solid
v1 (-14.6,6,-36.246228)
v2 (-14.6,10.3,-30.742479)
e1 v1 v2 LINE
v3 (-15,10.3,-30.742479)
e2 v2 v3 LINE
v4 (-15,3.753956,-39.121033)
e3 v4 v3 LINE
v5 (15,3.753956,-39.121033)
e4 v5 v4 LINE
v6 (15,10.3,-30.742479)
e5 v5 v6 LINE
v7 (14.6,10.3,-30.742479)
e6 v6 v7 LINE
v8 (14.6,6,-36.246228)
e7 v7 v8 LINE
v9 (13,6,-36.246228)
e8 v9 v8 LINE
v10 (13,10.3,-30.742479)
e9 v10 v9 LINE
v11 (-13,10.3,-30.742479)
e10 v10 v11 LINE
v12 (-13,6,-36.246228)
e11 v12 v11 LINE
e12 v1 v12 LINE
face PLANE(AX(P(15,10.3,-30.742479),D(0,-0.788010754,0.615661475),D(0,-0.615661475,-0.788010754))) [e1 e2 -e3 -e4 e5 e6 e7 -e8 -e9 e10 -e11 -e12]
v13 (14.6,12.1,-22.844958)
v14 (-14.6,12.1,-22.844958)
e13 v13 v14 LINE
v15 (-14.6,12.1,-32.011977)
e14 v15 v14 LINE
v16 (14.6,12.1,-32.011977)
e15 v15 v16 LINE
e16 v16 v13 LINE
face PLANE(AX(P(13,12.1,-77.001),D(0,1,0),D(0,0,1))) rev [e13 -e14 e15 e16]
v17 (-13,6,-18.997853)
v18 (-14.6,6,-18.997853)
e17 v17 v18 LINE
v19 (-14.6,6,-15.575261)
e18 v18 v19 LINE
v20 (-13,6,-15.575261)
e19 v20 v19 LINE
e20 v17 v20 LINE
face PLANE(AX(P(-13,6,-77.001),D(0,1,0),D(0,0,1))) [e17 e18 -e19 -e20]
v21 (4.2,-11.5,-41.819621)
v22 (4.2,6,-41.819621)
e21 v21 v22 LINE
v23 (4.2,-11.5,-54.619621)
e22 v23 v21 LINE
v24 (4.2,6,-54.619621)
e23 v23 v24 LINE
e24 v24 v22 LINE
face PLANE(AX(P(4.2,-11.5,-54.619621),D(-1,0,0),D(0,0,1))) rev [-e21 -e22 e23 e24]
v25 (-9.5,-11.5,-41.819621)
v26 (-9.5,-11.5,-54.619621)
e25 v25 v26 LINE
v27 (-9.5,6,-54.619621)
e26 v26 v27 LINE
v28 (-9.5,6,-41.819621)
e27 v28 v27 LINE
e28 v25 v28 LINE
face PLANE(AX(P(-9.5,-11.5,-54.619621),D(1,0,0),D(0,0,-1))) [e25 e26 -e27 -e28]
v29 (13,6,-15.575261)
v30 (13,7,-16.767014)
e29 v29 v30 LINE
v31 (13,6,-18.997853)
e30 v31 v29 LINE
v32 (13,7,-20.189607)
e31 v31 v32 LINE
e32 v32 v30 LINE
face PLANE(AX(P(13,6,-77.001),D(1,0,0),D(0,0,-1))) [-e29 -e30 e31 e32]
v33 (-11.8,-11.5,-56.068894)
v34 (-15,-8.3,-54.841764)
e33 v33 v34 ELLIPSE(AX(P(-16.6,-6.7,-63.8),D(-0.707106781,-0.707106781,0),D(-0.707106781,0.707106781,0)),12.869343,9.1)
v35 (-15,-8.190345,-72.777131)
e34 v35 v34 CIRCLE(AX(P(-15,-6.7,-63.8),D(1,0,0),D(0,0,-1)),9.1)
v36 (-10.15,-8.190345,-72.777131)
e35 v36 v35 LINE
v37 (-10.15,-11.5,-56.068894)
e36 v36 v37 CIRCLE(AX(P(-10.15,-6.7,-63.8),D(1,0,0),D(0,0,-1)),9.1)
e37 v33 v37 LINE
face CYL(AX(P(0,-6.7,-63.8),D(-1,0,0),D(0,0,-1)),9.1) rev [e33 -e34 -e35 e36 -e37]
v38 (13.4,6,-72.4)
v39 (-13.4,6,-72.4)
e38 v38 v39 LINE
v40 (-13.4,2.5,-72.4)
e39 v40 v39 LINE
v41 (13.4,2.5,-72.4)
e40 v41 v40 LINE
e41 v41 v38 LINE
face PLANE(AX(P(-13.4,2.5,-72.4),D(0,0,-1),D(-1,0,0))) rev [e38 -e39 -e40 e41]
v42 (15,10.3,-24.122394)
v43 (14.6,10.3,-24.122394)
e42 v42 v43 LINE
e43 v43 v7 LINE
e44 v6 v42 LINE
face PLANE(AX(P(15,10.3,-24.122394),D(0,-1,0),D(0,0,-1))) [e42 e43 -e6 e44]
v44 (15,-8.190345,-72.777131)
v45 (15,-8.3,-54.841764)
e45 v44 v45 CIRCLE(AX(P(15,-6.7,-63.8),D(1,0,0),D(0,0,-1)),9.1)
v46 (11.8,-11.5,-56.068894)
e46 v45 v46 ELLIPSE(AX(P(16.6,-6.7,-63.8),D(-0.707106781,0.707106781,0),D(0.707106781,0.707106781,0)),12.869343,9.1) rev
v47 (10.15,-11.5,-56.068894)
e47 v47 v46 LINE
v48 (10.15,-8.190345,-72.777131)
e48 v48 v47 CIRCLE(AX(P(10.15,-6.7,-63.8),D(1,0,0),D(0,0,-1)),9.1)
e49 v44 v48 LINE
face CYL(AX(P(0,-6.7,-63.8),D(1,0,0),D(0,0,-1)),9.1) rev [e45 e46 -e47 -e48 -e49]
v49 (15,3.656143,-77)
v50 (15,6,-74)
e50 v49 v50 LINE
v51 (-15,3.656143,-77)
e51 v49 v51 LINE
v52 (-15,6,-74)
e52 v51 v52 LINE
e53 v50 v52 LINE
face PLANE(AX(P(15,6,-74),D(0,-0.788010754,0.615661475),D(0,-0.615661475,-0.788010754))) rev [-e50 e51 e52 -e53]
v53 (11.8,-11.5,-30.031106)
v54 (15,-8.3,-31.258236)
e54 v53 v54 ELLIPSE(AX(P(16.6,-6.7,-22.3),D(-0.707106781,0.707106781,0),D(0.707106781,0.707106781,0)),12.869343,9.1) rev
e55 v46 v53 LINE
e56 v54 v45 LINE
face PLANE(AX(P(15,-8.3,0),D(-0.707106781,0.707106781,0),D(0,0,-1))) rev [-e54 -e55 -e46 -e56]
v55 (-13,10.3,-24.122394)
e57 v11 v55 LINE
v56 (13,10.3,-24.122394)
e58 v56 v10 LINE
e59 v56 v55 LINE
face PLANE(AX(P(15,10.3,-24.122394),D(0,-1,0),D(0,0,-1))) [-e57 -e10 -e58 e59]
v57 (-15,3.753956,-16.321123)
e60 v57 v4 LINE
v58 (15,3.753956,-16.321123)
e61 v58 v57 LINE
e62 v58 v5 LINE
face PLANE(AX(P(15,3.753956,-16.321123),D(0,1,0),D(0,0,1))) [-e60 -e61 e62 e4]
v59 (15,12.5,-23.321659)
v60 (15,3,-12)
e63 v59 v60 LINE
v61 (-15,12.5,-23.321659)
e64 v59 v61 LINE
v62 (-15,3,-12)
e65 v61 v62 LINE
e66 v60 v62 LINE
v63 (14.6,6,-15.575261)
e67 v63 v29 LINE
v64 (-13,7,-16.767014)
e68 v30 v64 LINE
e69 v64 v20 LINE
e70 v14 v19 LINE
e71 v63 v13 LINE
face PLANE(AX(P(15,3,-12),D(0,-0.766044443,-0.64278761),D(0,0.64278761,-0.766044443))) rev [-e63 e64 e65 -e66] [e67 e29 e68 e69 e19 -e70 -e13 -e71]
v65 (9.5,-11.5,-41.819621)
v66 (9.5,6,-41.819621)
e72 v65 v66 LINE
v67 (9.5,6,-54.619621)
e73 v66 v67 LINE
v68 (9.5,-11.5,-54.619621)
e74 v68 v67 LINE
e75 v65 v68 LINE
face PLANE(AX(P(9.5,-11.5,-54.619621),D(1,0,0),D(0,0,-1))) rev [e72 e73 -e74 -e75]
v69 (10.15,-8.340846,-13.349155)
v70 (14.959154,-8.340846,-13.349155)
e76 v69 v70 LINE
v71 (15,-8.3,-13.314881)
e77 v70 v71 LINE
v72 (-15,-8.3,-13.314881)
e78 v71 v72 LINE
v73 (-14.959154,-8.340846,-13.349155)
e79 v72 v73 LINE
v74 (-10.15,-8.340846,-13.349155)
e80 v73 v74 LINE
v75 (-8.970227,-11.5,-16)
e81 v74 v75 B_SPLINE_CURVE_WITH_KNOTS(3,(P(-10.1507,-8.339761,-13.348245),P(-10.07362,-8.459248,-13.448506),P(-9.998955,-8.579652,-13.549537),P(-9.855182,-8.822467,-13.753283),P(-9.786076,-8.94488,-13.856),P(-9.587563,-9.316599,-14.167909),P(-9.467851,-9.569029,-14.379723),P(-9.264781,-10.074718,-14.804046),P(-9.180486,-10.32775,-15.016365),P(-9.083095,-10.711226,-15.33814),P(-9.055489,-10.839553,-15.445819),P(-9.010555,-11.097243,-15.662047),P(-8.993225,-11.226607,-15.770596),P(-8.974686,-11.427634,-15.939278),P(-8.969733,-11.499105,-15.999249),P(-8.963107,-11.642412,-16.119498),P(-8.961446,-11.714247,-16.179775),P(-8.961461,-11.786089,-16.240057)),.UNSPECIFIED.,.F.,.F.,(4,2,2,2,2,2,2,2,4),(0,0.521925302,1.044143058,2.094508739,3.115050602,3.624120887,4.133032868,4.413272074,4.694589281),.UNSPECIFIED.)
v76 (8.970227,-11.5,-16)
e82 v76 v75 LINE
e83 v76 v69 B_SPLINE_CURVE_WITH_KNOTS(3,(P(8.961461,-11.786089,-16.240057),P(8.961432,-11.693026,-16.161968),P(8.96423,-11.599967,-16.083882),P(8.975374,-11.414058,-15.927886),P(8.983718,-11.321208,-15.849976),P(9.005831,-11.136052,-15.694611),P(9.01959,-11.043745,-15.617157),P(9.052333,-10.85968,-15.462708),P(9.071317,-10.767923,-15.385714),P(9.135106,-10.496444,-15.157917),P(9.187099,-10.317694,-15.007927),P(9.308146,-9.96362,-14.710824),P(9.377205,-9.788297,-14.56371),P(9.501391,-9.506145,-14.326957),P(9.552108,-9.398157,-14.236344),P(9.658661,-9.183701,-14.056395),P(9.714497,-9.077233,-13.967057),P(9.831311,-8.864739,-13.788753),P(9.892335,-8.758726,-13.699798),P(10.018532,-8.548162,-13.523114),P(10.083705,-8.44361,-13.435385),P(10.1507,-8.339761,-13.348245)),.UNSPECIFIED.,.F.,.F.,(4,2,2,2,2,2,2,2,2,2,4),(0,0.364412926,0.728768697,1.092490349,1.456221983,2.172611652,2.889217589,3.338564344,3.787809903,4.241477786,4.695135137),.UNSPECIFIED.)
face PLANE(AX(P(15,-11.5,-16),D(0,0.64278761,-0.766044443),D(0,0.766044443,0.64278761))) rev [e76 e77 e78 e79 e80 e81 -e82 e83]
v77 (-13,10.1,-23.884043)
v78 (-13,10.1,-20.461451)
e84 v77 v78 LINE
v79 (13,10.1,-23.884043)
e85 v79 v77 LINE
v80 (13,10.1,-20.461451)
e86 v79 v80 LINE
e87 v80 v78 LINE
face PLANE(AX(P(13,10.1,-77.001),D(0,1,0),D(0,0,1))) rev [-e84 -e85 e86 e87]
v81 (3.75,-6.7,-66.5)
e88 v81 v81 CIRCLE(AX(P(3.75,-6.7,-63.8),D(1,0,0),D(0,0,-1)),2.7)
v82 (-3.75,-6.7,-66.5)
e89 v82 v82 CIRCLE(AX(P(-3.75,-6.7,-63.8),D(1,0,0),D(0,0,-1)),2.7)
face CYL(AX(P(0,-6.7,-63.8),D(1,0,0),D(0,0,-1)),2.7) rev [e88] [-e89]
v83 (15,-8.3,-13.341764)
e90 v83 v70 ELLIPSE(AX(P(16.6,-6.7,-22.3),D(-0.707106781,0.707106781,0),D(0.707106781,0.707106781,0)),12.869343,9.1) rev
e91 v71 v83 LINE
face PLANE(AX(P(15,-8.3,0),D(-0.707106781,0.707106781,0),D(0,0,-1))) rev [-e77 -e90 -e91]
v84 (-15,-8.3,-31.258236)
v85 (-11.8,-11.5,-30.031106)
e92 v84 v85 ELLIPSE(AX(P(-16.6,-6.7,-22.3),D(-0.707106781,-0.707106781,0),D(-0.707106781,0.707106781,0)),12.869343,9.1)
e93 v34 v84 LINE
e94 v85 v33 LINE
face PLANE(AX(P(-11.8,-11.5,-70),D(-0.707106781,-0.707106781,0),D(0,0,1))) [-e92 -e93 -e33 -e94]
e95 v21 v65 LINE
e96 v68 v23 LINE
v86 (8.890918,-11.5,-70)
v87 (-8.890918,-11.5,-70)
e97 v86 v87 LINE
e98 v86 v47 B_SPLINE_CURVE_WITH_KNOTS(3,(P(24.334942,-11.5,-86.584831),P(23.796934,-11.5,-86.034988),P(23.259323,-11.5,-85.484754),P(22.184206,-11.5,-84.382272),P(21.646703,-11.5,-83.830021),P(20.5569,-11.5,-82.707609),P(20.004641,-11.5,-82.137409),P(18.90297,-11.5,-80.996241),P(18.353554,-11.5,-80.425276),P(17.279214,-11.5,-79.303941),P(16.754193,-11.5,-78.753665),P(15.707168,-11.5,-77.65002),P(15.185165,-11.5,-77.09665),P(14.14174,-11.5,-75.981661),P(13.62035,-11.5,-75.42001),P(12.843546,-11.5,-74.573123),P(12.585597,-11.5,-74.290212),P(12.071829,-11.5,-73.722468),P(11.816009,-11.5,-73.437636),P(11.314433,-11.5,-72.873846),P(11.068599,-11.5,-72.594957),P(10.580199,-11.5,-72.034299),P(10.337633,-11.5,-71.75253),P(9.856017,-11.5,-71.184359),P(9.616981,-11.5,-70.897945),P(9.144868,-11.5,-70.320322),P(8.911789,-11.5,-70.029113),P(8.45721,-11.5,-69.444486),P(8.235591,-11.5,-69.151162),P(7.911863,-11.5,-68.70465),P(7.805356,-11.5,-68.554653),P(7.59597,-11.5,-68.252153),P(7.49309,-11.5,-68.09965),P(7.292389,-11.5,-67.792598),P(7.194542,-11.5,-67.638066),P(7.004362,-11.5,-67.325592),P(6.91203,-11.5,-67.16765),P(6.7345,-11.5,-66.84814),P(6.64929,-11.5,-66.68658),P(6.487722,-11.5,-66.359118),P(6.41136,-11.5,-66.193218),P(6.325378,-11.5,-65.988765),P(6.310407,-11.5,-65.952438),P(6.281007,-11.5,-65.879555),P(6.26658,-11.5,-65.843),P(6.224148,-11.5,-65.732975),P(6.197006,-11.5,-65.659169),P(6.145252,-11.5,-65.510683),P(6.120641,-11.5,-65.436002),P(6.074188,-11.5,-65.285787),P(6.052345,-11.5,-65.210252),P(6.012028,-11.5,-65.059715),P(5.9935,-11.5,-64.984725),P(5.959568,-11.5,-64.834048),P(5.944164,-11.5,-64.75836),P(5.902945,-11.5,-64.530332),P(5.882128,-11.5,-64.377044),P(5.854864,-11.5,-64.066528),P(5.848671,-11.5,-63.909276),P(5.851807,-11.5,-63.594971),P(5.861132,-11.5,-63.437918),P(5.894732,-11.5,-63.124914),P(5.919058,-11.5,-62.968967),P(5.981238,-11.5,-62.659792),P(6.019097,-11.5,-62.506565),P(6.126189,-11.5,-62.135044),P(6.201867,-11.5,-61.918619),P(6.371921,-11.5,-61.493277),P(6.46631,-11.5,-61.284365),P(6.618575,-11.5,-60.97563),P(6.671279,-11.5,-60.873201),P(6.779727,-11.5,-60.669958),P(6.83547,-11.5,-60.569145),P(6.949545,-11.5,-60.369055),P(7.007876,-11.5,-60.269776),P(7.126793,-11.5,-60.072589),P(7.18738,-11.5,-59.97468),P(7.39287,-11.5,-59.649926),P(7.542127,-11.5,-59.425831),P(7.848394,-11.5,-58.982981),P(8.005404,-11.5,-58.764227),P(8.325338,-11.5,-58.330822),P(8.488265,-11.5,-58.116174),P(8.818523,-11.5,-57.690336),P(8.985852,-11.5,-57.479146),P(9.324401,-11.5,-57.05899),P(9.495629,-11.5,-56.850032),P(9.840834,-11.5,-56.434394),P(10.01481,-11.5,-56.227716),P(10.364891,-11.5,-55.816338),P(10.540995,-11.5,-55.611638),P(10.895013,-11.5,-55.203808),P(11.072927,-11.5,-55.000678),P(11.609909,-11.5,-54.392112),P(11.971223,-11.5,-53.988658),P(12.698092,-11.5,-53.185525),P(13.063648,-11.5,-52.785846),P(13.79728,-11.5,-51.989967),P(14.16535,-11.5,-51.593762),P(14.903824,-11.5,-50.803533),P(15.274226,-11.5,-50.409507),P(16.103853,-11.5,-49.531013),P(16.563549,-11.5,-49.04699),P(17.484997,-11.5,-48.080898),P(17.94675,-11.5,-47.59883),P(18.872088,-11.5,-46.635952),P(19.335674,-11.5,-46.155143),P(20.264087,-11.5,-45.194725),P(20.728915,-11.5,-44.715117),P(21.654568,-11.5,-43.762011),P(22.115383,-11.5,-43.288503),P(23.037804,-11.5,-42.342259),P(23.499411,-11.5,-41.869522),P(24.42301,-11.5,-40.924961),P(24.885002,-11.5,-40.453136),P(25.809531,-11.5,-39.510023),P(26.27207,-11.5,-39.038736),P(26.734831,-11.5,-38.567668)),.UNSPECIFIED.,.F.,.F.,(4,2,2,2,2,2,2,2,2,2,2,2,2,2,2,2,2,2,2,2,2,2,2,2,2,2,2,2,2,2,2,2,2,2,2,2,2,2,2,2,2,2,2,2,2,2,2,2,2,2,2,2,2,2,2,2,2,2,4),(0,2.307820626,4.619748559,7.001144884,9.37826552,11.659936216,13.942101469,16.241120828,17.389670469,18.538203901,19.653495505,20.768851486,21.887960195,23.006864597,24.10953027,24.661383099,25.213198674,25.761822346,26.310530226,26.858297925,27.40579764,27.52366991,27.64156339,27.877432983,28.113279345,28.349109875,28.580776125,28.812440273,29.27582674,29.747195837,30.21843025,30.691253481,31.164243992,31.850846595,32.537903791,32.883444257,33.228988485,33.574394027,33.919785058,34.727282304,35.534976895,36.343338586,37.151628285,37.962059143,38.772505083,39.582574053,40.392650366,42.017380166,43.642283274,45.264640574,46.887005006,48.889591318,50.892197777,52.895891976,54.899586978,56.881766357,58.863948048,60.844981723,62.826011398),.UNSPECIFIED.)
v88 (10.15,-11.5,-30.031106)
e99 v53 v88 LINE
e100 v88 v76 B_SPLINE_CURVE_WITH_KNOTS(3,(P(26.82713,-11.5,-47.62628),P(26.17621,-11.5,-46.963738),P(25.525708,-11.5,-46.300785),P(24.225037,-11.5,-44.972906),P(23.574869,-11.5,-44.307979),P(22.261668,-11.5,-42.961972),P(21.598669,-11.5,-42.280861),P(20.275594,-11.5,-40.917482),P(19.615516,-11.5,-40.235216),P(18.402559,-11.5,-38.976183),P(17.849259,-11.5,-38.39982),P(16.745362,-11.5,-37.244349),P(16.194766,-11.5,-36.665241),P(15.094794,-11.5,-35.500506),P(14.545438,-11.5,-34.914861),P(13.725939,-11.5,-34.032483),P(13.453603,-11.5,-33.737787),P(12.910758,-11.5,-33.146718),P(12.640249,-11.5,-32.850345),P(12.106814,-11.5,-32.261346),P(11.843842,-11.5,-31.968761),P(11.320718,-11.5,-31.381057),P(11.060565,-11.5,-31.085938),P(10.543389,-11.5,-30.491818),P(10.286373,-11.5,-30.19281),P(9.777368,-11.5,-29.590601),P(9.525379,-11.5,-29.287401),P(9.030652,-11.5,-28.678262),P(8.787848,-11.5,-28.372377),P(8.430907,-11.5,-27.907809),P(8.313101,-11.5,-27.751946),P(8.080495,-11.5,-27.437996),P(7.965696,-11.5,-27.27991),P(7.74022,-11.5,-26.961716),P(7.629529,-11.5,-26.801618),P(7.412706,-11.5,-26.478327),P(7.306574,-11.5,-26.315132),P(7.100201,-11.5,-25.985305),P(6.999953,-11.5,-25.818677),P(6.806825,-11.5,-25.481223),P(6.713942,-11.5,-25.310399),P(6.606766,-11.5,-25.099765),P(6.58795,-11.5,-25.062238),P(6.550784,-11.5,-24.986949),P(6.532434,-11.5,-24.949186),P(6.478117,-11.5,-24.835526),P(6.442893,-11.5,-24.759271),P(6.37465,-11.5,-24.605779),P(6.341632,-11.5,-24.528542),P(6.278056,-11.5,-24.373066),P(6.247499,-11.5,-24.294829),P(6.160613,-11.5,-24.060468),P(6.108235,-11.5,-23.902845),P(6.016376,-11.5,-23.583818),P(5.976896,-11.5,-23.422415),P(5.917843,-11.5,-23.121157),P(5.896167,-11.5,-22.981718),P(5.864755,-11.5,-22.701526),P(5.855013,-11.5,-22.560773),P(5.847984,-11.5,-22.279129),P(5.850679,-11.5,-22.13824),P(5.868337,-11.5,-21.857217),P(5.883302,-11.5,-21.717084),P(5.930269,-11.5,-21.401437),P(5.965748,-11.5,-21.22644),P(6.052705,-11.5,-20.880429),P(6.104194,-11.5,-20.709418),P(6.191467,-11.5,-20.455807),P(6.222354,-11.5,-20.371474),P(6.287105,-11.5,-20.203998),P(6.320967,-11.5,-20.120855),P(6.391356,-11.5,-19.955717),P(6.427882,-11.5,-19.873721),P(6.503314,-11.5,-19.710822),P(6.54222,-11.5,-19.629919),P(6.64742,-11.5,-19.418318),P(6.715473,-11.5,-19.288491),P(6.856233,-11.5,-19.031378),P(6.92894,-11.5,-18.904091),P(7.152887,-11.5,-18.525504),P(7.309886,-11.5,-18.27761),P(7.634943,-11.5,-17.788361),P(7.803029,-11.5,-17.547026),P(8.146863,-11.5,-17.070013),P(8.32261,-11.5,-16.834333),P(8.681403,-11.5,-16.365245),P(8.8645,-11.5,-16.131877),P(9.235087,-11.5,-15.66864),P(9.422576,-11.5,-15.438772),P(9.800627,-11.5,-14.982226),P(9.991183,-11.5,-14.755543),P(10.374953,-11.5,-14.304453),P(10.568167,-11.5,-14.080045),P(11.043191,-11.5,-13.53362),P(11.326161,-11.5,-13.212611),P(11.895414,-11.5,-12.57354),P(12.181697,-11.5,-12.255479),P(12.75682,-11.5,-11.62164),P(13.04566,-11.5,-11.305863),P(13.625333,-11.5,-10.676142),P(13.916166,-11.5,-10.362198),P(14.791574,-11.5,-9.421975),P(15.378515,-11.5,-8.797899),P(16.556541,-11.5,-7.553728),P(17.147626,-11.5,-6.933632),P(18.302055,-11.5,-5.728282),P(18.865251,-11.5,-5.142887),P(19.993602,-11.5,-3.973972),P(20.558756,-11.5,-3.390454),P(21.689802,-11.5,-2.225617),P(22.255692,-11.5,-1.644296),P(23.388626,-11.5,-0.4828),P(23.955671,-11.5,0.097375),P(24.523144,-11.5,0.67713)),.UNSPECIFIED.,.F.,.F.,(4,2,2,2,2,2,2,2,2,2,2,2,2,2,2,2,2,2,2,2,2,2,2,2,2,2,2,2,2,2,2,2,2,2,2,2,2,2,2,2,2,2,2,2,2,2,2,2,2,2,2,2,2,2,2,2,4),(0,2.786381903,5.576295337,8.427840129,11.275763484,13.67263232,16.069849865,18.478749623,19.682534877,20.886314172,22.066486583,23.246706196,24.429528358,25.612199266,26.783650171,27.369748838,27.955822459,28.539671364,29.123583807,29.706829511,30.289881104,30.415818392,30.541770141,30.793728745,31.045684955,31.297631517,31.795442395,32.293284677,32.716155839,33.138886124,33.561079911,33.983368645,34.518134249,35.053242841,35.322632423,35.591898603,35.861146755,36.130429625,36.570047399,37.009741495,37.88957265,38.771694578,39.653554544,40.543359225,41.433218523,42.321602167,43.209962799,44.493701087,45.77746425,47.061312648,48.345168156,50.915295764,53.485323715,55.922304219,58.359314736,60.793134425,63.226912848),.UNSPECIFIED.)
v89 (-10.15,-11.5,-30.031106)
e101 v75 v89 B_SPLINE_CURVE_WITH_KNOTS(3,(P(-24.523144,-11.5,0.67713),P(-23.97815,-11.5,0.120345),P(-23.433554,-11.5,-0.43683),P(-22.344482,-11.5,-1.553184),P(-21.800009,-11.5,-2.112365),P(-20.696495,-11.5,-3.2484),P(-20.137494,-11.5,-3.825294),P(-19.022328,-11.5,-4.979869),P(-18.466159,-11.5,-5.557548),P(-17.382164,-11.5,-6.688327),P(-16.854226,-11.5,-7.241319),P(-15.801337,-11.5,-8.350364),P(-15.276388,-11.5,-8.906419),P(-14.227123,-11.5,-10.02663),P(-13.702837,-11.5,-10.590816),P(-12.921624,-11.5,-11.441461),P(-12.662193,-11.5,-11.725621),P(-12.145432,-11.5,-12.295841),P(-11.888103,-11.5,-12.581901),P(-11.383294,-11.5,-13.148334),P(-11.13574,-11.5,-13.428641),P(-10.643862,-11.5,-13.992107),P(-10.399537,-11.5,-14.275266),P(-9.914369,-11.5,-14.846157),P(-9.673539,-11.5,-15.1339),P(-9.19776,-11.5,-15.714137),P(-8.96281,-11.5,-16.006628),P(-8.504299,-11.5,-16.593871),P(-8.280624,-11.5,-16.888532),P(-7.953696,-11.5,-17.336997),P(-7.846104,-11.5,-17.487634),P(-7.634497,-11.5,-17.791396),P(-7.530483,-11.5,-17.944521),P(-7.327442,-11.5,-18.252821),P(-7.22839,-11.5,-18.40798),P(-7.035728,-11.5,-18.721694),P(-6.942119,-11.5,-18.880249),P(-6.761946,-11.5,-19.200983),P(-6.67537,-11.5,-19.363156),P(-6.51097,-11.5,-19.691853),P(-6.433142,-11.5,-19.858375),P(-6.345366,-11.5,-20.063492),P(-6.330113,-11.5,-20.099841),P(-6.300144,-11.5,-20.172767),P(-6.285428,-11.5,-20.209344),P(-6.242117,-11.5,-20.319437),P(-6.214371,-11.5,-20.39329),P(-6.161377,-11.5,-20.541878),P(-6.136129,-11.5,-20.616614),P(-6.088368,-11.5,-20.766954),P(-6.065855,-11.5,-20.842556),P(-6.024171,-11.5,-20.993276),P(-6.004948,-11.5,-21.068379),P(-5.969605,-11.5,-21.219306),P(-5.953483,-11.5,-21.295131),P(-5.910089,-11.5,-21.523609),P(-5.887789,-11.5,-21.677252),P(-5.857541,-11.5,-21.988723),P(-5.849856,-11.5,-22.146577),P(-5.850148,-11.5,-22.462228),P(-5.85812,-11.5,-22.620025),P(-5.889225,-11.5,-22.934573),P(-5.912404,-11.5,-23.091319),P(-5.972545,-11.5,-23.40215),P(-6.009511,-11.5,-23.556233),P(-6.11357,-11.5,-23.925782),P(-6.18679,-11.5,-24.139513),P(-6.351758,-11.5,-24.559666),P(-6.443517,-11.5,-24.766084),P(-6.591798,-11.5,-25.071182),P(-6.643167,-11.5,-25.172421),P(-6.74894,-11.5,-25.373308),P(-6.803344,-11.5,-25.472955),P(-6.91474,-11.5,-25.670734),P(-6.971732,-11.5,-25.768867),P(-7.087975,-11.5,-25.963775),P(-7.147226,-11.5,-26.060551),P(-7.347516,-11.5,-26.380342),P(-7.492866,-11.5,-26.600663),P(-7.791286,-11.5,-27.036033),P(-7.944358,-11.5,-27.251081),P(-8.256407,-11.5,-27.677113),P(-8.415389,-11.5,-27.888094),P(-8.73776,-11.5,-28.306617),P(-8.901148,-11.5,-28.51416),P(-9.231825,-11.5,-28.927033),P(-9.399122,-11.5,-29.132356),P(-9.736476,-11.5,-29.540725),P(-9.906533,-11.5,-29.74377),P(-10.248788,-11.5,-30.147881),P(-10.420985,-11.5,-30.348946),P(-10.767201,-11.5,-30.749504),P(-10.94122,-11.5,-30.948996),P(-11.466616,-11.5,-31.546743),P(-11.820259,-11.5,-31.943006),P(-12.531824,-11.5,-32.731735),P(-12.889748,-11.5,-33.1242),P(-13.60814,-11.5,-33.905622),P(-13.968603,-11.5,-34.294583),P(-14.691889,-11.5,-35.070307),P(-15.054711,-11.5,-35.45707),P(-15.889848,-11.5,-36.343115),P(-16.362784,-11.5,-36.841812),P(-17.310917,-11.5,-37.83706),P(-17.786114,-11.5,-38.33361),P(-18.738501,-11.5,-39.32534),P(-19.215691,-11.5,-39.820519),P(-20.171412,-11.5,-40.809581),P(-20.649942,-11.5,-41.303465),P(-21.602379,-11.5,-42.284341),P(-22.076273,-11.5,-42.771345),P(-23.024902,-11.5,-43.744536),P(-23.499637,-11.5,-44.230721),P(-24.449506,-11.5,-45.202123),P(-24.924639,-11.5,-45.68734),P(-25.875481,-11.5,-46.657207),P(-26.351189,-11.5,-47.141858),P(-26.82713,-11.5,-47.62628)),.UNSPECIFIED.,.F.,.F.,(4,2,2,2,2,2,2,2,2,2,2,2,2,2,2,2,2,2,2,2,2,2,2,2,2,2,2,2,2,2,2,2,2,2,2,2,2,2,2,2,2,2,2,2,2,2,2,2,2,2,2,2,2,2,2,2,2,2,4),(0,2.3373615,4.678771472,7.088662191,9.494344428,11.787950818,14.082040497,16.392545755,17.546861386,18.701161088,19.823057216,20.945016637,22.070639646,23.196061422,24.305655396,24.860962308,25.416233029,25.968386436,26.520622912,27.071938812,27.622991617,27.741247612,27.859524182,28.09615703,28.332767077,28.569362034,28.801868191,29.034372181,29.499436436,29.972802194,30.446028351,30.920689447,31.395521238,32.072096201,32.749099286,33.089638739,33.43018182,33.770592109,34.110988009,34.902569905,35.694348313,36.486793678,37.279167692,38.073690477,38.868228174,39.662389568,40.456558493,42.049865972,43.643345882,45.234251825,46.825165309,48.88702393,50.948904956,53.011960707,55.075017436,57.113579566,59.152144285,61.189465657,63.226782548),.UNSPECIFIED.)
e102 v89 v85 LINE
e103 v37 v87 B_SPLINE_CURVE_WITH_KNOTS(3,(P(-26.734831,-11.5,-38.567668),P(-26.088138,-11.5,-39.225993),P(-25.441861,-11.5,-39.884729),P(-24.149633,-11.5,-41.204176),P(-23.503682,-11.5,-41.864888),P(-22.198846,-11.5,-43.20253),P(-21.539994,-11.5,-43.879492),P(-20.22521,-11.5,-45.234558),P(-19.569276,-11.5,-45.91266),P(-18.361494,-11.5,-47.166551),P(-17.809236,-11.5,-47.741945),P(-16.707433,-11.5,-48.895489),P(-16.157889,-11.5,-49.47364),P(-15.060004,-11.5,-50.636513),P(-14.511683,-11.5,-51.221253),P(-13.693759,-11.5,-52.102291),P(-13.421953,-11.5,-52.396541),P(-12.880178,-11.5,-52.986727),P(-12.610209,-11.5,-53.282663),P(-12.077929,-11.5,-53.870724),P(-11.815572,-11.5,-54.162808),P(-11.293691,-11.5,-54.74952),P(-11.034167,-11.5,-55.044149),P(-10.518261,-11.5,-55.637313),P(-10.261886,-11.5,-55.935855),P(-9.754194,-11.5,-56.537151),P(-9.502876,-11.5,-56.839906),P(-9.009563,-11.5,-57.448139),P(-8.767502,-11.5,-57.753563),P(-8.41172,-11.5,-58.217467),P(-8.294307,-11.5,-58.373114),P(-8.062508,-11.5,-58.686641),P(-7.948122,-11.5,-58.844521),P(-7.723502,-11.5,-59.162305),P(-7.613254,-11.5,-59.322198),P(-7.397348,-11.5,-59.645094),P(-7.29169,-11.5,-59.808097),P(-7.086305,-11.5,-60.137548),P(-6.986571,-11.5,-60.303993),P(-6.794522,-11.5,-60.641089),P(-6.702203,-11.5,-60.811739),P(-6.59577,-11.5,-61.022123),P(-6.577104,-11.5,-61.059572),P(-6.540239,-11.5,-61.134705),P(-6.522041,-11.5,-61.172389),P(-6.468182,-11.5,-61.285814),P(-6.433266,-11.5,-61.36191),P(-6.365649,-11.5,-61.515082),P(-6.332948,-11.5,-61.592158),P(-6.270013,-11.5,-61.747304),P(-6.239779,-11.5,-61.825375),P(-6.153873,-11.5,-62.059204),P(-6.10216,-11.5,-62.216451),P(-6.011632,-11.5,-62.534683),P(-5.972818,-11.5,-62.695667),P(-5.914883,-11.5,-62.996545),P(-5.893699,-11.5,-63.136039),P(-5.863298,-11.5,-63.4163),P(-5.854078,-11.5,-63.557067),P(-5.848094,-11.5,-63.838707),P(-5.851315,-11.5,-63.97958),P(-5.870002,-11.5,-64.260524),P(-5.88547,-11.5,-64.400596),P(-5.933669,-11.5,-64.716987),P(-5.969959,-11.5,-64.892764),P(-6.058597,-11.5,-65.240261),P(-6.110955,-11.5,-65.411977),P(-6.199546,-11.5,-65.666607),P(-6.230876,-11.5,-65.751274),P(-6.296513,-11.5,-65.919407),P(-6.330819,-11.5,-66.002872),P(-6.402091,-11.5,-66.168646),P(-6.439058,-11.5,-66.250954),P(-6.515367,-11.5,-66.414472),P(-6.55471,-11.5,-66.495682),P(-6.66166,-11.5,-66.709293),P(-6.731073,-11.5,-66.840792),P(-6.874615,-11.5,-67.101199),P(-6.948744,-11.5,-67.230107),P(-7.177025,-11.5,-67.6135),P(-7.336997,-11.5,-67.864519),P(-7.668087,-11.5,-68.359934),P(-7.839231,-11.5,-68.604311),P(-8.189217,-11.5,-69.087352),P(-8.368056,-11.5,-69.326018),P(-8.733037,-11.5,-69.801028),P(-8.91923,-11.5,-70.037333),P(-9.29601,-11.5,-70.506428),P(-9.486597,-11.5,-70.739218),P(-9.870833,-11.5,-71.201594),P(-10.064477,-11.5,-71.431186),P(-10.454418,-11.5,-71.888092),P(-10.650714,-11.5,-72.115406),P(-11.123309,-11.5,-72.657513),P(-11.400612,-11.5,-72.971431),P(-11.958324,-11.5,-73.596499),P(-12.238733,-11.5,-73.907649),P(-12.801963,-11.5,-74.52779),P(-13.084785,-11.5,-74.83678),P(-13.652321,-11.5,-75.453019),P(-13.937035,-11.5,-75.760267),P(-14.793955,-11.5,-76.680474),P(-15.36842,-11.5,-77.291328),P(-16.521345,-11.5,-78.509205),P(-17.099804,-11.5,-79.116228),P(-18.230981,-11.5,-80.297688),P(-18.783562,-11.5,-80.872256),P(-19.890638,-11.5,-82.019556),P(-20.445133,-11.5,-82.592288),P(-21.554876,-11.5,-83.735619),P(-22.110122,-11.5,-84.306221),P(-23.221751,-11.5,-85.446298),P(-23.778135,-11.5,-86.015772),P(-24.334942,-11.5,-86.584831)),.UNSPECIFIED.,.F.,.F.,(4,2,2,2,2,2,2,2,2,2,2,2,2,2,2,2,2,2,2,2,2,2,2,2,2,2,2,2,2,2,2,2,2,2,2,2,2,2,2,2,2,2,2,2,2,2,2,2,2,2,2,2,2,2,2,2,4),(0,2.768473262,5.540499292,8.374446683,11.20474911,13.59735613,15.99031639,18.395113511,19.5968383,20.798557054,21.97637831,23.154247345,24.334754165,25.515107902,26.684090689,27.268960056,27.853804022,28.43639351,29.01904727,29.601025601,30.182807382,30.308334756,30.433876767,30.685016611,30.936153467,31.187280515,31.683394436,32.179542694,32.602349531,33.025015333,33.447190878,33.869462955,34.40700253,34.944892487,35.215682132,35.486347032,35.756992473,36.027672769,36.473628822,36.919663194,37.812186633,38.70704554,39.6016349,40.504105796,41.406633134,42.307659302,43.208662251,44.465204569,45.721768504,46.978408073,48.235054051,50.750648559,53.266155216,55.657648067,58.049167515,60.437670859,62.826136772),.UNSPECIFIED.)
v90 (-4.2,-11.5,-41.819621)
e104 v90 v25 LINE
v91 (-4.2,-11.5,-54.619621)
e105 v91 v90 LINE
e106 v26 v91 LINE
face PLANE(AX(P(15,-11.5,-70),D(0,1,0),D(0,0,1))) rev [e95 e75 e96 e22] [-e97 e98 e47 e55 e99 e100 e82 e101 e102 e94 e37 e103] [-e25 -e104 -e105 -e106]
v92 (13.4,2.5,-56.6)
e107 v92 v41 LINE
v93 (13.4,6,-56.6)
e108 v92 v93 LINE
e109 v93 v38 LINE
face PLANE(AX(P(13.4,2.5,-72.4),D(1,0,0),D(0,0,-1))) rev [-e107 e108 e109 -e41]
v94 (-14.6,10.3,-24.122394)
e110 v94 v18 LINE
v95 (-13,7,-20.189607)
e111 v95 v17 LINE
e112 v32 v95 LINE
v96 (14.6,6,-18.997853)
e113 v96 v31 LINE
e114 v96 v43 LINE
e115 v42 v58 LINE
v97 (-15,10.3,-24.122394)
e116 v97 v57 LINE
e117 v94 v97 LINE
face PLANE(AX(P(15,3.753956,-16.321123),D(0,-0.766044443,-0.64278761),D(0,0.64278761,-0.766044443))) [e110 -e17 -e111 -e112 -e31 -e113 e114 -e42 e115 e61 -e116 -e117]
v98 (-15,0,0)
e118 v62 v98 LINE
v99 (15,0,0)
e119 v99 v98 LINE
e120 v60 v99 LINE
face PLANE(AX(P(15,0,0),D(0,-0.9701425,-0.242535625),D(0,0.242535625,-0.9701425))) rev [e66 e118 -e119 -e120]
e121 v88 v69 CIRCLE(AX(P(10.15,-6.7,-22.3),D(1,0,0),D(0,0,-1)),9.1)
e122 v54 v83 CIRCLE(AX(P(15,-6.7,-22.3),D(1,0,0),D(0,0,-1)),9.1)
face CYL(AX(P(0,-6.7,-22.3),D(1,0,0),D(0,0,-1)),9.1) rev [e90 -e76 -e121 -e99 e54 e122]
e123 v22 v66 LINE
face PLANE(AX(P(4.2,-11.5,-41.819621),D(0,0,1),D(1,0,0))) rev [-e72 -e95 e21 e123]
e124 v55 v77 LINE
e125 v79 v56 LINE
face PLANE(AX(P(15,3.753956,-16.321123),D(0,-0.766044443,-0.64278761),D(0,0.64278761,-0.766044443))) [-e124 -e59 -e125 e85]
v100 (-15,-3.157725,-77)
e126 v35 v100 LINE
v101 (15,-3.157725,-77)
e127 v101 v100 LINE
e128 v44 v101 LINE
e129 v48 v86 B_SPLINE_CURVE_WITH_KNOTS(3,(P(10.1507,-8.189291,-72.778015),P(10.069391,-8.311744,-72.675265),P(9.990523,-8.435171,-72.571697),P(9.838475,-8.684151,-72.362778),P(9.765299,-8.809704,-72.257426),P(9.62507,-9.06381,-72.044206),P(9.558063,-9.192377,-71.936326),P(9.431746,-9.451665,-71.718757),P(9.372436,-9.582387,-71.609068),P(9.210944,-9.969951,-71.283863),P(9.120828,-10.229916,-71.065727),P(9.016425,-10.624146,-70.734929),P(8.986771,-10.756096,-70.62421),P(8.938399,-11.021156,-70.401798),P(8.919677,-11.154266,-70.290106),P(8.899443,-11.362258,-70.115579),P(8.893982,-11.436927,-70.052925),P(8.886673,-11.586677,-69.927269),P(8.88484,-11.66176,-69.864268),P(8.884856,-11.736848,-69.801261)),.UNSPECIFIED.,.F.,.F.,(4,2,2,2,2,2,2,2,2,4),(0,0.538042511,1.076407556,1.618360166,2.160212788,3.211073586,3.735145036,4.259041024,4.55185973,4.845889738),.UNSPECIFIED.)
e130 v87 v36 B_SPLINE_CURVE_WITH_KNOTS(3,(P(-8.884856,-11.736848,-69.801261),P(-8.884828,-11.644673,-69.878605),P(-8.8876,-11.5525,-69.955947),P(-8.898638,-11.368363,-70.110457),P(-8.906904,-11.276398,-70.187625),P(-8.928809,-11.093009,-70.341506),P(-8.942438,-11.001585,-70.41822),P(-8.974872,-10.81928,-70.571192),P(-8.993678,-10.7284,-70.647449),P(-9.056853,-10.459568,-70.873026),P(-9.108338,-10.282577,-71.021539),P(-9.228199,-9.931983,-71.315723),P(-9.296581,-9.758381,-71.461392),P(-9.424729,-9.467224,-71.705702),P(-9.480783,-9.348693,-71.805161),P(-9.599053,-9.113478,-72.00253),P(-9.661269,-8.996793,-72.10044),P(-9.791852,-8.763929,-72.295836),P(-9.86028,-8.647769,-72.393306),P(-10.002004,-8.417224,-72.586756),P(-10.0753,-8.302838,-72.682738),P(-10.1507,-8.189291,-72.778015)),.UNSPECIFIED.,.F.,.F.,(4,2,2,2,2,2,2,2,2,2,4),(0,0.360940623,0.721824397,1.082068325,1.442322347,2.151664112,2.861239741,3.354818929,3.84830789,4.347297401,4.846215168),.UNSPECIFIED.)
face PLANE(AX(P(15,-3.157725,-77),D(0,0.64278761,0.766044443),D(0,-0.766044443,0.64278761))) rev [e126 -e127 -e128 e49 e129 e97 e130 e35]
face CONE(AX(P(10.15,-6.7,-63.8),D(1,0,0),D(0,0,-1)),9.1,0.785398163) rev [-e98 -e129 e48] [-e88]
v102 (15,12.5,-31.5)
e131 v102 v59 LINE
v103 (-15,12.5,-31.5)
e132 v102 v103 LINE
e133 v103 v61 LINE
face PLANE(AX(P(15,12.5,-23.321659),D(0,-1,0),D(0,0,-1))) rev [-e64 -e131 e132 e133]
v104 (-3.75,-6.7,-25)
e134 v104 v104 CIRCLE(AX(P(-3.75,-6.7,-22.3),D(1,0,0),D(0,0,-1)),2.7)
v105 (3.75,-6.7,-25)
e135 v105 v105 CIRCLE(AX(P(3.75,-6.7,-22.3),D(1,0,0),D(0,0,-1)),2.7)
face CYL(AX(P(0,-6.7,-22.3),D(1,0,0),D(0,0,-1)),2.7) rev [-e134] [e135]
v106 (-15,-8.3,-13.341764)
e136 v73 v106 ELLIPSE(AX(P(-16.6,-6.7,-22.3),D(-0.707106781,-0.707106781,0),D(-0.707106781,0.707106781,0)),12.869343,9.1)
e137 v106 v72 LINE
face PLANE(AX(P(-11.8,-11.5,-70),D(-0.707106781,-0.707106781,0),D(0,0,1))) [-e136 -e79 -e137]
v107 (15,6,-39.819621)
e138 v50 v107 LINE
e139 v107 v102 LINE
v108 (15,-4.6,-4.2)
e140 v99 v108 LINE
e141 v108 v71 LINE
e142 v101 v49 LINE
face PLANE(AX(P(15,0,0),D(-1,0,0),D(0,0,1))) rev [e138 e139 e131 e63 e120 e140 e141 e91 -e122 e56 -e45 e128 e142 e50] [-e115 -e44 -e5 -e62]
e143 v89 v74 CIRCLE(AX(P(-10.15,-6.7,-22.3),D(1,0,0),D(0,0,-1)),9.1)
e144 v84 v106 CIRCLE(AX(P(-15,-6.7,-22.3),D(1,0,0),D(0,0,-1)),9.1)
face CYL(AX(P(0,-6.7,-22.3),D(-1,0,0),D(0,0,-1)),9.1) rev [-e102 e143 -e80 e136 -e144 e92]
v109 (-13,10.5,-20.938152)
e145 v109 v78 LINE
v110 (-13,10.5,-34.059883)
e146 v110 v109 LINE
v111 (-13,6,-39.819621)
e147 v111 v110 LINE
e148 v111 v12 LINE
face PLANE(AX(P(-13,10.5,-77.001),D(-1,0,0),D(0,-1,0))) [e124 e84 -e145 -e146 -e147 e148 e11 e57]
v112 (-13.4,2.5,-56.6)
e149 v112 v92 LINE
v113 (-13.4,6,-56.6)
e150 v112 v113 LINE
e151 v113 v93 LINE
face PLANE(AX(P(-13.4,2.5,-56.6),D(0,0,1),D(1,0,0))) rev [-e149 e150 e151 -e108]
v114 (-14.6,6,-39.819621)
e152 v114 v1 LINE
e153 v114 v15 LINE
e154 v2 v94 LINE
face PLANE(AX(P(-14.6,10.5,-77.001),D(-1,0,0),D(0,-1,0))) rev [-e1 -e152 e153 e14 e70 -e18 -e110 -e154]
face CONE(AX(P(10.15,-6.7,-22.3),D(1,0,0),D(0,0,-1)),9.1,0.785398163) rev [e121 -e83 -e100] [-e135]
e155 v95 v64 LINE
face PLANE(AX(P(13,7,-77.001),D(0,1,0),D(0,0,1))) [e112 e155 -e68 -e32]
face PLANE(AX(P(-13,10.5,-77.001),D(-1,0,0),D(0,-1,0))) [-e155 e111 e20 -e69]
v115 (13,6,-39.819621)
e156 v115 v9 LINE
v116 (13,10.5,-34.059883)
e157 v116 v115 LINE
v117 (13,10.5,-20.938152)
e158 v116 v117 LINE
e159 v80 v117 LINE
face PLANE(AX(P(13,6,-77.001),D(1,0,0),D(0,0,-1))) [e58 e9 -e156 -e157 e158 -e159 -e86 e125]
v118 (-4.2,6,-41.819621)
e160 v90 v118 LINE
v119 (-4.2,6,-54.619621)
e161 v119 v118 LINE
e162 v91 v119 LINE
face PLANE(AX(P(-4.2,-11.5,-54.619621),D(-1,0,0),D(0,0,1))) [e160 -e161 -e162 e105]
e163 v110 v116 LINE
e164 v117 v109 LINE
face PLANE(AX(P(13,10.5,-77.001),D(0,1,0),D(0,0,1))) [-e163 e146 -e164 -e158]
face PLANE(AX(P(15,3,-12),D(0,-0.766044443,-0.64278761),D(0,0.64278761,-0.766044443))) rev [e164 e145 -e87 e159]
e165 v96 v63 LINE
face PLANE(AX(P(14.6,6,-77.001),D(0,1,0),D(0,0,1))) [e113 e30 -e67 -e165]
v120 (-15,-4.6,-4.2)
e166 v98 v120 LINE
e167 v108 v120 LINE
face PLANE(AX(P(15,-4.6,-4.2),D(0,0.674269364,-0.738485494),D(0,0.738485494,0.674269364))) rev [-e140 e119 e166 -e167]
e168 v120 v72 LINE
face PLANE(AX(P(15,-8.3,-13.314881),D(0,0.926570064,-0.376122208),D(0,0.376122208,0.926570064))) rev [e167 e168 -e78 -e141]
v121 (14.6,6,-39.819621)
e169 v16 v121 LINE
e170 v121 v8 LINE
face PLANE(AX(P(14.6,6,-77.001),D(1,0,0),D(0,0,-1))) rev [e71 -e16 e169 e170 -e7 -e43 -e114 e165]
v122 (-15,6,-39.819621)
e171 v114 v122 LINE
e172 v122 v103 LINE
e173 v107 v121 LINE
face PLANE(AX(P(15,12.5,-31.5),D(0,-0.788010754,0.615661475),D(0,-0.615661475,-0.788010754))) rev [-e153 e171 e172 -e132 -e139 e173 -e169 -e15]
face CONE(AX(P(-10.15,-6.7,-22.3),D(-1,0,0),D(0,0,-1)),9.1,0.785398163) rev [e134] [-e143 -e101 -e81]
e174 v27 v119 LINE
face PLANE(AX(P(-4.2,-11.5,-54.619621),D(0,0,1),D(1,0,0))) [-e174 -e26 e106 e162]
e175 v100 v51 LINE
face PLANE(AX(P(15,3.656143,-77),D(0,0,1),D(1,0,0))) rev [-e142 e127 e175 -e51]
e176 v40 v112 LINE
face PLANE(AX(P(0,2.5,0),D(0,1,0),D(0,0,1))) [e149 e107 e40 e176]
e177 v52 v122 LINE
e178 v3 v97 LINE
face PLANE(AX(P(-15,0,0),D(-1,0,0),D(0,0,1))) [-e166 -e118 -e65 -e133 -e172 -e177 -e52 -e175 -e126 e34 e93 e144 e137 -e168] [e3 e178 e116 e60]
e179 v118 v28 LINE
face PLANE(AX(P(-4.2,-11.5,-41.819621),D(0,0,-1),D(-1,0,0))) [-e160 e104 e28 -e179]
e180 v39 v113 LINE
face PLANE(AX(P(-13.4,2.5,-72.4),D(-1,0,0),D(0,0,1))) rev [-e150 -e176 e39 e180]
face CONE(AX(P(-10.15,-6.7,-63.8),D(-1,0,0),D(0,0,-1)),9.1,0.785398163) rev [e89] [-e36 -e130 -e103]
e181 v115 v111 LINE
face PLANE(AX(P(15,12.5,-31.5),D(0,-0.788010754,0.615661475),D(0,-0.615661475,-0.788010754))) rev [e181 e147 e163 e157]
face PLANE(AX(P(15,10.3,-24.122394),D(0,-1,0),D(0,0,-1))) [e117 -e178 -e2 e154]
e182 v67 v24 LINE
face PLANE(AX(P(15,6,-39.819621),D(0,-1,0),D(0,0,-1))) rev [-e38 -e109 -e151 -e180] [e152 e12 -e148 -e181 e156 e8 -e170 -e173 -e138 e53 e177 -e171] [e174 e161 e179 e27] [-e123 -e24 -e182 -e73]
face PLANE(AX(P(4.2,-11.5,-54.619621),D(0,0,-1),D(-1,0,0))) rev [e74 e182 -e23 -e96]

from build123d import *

# Parameters (mm, degrees)
BOSS_EXTRUDE1_DEPTH      = 15
CHAMFER1_SIZE            = 3.2
LPATTERN1_COUNT          = 2
LPATTERN1_PITCH          = 41.5
SKETCH4_W                = 5.3
SKETCH4_H                = 12.8
CUT_EXTRUDE1_DEPTH       = 81.375680401
SKETCH5_W                = 26.8
SKETCH5_H                = 15.8
CUT_EXTRUDE2_DEPTH       = 3.5
CUT_EXTRUDE_THIN11_REACH = 81.437
SKETCH6_W                = 26
SKETCH6_H                = 1.6


with BuildPart() as part:
    # Sketch1 → Boss-Extrude1 (new, symmetric)
    with BuildSketch(Plane(origin=(0, 0, 0), x_dir=(0, 0, -1), z_dir=(1, 0, 0))):
        Polygon((0, 0), (12, 3), (23.32165913, 12.5), (31.5, 12.5), (39.819620609, 6), (74, 6), (77, 3.65614312), (77, -3.157724852), (70, -11.5), (16, -11.5), (13.31488118, -8.3), (4.2, -4.6), align=None)
        Polygon((16.321122645, 3.753956381), (24.122393645, 10.3), (30.742479251, 10.3), (39.121033004, 3.753956381), align=None, mode=Mode.SUBTRACT)
    extrude(amount=BOSS_EXTRUDE1_DEPTH, both=True)

    # Chamfer1
    chamfer1_edges = [part.edges().sort_by_distance(p)[0] for p in [
        (-15, -11.5, -43),
        (15, -11.5, -43),
    ]]
    chamfer(chamfer1_edges, length=CHAMFER1_SIZE)

    # Sketch2 → Cut-Revolve1 (revolve, cut)
    with BuildSketch(Plane.XY.offset(-22.3)):
        Polygon((15, 2.4), (10.15, 2.4), (3.75, -4), (0, -4), (0, -6.7), (15, -6.7), align=None)
    cut_revolve1 = revolve(axis=Axis((0, -6.7, -22.3), (-1, 0, 0)), mode=Mode.SUBTRACT)

    # Mirror1: Cut-Revolve1 across plane
    add(cut_revolve1.mirror(Plane(origin=(0, 0, 0), x_dir=(0, 0, 1), z_dir=(1, 0, 0))), mode=Mode.SUBTRACT)

    # LPattern1: Cut-Revolve1 ×2
    with Locations(*[(0, 0, -i * LPATTERN1_PITCH) for i in range(1, LPATTERN1_COUNT)]):
        add(cut_revolve1, mode=Mode.SUBTRACT)

    # Mirror2 copy 1 sketch → Mirror2 copy 1 (revolve, cut)
    with BuildSketch(Plane(origin=(0, 0, -63.8), x_dir=(-1, 0, 0), z_dir=(0, 0, 1))):
        Polygon((15, -2.4), (10.15, -2.4), (3.75, 4), (0, 4), (0, 6.7), (15, 6.7), align=None)
    revolve(axis=Axis((0, -6.7, -63.8), (-1, 0, 0)), mode=Mode.SUBTRACT)

    # Mirror2 copy 2 sketch → Mirror2 copy 2 (revolve, cut)
    with BuildSketch(Plane(origin=(0, 0, -22.3), x_dir=(-1, 0, 0), z_dir=(0, 0, 1))):
        Polygon((15, -2.4), (10.15, -2.4), (3.75, 4), (0, 4), (0, 6.7), (15, 6.7), align=None)
    revolve(axis=Axis((0, -6.7, -22.3), (-1, 0, 0)), mode=Mode.SUBTRACT)

    # Sketch4 → Cut-Extrude1 (cut, through all)
    with BuildSketch(Plane(origin=(0, 6, 0), x_dir=(1, 0, 0), z_dir=(0, 1, 0))):
        with Locations((6.85, 48.219620609)):
            Rectangle(SKETCH4_W, SKETCH4_H)
    cut_extrude1 = extrude(amount=-CUT_EXTRUDE1_DEPTH, mode=Mode.SUBTRACT)

    # Mirror3: Cut-Extrude1 across plane
    add(cut_extrude1.mirror(Plane(origin=(0, 0, 0), x_dir=(0, 0, 1), z_dir=(1, 0, 0))), mode=Mode.SUBTRACT)

    # Sketch5 → Cut-Extrude2 (cut)
    with BuildSketch(Plane(origin=(0, 6, 0), x_dir=(1, 0, 0), z_dir=(0, 1, 0))):
        with Locations((0, 64.5)):
            Rectangle(SKETCH5_W, SKETCH5_H)
    extrude(amount=-CUT_EXTRUDE2_DEPTH, mode=Mode.SUBTRACT)

    # Sketch6 → Cut-Extrude-Thin11 (cut, up to next)
    with BuildSketch(Plane.XY, mode=Mode.PRIVATE) as cut_extrude_thin11_sk1:
        with Locations((0, 7.8)):
            Rectangle(SKETCH6_W, SKETCH6_H)
    cut_extrude_thin11_tool1 = extrude(cut_extrude_thin11_sk1.sketch, amount=-CUT_EXTRUDE_THIN11_REACH, mode=Mode.PRIVATE) & part.part
    # Sketch6 → Cut-Extrude-Thin11 (cut, up to next)
    with BuildSketch(Plane.XY, mode=Mode.PRIVATE) as cut_extrude_thin11_sk2:
        Polygon((13, 6), (13, 10.5), (-13, 10.5), (-13, 6), (-14.6, 6), (-14.6, 12.1), (14.6, 12.1), (14.6, 6), align=None)
    cut_extrude_thin11_tool2 = extrude(cut_extrude_thin11_sk2.sketch, amount=-CUT_EXTRUDE_THIN11_REACH, mode=Mode.PRIVATE) & part.part
    # Sketch6 → Cut-Extrude-Thin11 (cut, up to next)
    with BuildSketch(Plane.XY, mode=Mode.PRIVATE) as cut_extrude_thin11_sk3:
        with Locations((0, 9.3)):
            Rectangle(SKETCH6_W, SKETCH6_H)
    cut_extrude_thin11_tool3 = extrude(cut_extrude_thin11_sk3.sketch, amount=-CUT_EXTRUDE_THIN11_REACH, mode=Mode.PRIVATE) & part.part
    add(cut_extrude_thin11_tool1.solids().sort_by_distance((0, 7.8, 0))[0], mode=Mode.SUBTRACT)
    add(cut_extrude_thin11_tool2.solids().sort_by_distance((0, 10.581414, 0))[0], mode=Mode.SUBTRACT)
    add(cut_extrude_thin11_tool3.solids().sort_by_distance((0, 9.3, 0))[0], mode=Mode.SUBTRACT)


solid = part.part
